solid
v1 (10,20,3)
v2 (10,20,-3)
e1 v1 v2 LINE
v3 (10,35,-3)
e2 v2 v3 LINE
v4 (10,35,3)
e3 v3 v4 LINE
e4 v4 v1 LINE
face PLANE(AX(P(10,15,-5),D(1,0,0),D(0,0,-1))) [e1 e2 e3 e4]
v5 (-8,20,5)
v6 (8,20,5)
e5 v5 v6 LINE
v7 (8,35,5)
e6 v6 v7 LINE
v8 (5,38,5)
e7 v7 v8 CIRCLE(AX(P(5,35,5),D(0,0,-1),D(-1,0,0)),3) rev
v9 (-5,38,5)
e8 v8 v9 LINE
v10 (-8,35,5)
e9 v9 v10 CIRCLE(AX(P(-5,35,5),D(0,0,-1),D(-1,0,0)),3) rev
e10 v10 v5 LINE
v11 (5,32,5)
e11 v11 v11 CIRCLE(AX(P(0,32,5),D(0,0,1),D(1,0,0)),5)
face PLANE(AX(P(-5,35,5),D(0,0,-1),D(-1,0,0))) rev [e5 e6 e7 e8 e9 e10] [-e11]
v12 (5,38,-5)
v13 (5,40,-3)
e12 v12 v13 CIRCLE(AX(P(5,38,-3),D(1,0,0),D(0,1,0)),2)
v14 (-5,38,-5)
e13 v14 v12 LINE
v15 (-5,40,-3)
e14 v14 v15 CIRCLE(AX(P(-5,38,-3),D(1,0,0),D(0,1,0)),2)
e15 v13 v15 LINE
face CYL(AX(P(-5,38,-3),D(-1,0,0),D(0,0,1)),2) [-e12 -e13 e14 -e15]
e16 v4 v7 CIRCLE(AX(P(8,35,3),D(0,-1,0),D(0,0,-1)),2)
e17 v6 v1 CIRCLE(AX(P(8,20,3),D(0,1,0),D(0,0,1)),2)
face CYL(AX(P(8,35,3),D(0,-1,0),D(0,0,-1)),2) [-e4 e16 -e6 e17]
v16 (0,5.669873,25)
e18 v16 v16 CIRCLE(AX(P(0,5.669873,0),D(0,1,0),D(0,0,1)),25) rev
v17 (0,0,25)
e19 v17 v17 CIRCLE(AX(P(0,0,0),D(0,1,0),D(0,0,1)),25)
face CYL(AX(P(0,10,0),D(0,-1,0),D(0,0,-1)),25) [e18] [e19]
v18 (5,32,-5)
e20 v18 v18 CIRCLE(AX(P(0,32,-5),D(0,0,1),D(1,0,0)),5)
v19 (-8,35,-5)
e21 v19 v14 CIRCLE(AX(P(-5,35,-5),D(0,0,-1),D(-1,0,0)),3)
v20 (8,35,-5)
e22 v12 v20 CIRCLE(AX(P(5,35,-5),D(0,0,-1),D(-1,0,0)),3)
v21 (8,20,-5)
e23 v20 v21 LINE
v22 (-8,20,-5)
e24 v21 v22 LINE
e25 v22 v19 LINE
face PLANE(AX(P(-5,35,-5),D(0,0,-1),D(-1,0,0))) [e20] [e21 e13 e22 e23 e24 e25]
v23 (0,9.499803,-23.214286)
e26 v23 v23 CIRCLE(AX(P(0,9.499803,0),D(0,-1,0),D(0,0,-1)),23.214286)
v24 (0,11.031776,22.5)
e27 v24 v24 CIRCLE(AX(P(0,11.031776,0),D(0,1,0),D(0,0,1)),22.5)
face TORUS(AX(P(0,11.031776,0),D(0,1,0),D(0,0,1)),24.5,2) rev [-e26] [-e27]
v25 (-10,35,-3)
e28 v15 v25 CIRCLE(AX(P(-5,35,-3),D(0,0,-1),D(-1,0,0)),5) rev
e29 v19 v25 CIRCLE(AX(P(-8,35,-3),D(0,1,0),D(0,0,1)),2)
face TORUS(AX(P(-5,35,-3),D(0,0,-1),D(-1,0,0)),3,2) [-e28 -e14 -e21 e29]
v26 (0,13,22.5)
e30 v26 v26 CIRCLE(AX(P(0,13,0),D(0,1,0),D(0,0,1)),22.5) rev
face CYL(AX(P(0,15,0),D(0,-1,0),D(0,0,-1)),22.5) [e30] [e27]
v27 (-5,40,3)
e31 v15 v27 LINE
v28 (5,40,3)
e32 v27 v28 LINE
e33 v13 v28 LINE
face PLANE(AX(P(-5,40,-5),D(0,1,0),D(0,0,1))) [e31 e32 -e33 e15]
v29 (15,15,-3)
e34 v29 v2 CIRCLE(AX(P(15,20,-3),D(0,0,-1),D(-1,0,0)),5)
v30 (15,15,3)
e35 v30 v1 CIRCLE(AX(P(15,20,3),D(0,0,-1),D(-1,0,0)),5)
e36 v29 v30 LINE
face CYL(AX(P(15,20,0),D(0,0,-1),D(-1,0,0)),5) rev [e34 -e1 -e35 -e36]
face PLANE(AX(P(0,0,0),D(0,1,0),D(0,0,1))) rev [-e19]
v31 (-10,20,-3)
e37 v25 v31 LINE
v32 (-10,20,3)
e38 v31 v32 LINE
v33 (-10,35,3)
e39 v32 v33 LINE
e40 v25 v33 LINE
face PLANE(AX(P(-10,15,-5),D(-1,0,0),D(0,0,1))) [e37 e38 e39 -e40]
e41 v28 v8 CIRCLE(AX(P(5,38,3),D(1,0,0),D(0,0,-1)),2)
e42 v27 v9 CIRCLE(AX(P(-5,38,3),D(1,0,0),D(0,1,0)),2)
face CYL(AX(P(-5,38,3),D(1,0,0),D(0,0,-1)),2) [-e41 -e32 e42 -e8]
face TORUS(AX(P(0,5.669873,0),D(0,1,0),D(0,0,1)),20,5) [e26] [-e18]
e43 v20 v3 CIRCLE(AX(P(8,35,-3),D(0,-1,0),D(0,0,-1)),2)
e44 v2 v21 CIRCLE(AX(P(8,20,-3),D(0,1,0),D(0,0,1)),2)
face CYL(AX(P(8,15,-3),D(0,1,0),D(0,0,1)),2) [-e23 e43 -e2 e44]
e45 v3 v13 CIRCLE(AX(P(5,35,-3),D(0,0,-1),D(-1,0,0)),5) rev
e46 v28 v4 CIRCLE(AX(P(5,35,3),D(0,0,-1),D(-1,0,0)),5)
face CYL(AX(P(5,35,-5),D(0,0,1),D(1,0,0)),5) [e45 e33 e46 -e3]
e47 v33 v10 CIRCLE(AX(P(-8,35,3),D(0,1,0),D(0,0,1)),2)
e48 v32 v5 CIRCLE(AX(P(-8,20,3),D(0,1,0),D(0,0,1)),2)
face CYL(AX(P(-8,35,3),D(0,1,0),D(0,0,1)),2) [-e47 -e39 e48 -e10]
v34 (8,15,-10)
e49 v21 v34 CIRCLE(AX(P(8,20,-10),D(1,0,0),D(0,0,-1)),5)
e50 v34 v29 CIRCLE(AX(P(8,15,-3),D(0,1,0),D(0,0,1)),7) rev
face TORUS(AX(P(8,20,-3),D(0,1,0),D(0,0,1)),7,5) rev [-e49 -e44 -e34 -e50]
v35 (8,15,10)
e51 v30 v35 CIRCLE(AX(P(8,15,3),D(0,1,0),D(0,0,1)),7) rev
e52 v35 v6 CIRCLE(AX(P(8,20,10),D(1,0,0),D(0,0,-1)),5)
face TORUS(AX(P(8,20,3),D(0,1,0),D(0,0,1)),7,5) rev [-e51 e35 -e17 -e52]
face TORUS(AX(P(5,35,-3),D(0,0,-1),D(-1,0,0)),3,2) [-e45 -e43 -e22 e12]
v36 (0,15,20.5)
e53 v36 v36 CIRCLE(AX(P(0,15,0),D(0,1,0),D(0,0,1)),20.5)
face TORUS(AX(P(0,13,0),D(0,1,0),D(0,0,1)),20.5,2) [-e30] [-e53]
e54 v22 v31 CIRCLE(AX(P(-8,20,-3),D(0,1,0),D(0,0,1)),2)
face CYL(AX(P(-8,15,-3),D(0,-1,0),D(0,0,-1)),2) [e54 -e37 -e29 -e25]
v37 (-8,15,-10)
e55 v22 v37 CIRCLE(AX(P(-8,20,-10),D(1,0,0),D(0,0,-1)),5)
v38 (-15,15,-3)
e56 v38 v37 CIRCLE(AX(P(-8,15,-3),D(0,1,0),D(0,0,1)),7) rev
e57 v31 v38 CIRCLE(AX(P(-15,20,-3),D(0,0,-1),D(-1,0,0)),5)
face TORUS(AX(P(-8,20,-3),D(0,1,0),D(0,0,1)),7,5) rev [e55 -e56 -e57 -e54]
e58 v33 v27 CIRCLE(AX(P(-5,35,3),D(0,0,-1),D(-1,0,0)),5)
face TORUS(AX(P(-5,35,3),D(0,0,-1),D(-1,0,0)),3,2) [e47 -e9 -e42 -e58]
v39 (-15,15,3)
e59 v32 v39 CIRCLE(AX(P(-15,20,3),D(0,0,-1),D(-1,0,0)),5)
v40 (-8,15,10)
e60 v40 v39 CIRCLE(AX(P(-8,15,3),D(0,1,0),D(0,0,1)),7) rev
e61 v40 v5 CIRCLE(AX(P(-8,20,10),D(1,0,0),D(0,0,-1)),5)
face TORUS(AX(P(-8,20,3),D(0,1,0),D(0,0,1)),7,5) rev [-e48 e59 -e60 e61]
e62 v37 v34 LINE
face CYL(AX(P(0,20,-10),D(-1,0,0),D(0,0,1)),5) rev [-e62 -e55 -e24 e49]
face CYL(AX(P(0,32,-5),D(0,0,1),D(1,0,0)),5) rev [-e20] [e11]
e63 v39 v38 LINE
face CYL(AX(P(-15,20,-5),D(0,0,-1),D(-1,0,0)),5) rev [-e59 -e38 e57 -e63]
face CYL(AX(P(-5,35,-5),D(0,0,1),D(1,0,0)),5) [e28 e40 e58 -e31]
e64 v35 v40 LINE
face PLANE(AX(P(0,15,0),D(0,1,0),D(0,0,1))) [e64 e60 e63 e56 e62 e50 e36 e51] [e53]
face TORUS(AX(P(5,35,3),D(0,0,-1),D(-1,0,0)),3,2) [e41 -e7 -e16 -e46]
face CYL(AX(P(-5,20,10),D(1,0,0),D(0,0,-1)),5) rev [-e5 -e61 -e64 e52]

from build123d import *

# Parameters (mm, degrees)
SKETCH1_R           = 25
BOSS_EXTRUDE1_DEPTH = 10
SKETCH2_R           = 22.5
BOSS_EXTRUDE2_DEPTH = 5
FILLET3_R           = 5
FILLET4_R           = 2
FILLET5_R           = 2
SKETCH3_R           = 5
BOSS_EXTRUDE3_DEPTH = 5
FILLET6_R           = 2
FILLET7_R           = 2
FILLET8_R           = 5


with BuildPart() as part:
    # Sketch1 → Boss-Extrude1 (new body)
    with BuildSketch(Plane(origin=(0, 0, 0), x_dir=(1, 0, 0), z_dir=(0, 1, 0))):
        with Locations(Location((0, 0, 0), (0, 0, 270))):
            Circle(SKETCH1_R)
    extrude(amount=BOSS_EXTRUDE1_DEPTH)

    # Sketch2 → Boss-Extrude2 (add)
    with BuildSketch(Plane(origin=(0, 10, 0), x_dir=(1, 0, 0), z_dir=(0, 1, 0))):
        with Locations(Location((0, 0, 0), (0, 0, 270))):
            Circle(SKETCH2_R)
    extrude(amount=BOSS_EXTRUDE2_DEPTH)

    # Fillet3
    # the kernel refuses this fillet: 5 mm, written as the material it takes off along each edge
    with BuildSketch(Plane(origin=(0, 10, 0), x_dir=(0, 0, 1), z_dir=(-1, 0, 0))) as fillet3_piece_1:
        with BuildLine():
            CenterArc((20, -4.330127019), FILLET3_R, 0, 60)
            Line((22.5, 0), (22.55, 0.08660254))
            ThreePointArc((22.55, 0.08660254), (23.75, 0.1), (25, 0.1))
            Line((25, 0.1), (25.1, 0))
            Line((25.1, 0), (25.1, -4.330127019))
            Line((25.1, -4.330127019), (25, -4.330127019))
        make_face()
    revolve(axis=Axis((0, 10, 0), (0, 1, 0)), mode=Mode.SUBTRACT)

    # Fillet4
    fillet4_edges = [part.edges().sort_by_distance(p)[0] for p in [
        (0, 15, -22.5),
    ]]
    fillet(fillet4_edges, radius=FILLET4_R)

    # Fillet5
    fillet5_edges = [part.edges().sort_by_distance(p)[0] for p in [
        (0, 10, -22.5),
    ]]
    fillet(fillet5_edges, radius=FILLET5_R)

    # Sketch3 → Boss-Extrude3 (add, symmetric)
    with BuildSketch(Plane.XY):
        with BuildLine():
            Line((-10, 15), (10, 15))
            Line((10, 15), (10, 35))
            ThreePointArc((10, 35), (8.535533906, 38.535533906), (5, 40))
            Line((5, 40), (-5, 40))
            ThreePointArc((-5, 40), (-8.535533906, 38.535533906), (-10, 35))
            Line((-10, 35), (-10, 15))
        make_face()
        with Locations((0, 32)):
            Circle(SKETCH3_R, mode=Mode.SUBTRACT)
    extrude(amount=BOSS_EXTRUDE3_DEPTH, both=True)

    # Fillet6
    fillet6_edges = [part.edges().sort_by_distance(p)[0] for p in [
        (-10, 25, 5),
        (10, 25, 5),
        (8.535533906, 38.535533906, 5),
        (0, 40, 5),
        (-8.535533906, 38.535533906, 5),
    ]]
    fillet(fillet6_edges, radius=FILLET6_R)

    # Fillet7
    fillet7_edges = [part.edges().sort_by_distance(p)[0] for p in [
        (-10, 25, -5),
        (-8.535533906, 38.535533906, -5),
        (0, 40, -5),
        (8.535533906, 38.535533906, -5),
        (10, 25, -5),
    ]]
    fillet(fillet7_edges, radius=FILLET7_R)

    # Fillet8
    fillet8_edges = [part.edges().sort_by_distance(p)[0] for p in [
        (0, 15, 5),
        (9.414213562, 15, 4.414213562),
        (-9.414213562, 15, 4.414213562),
        (10, 15, 0),
        (0, 15, -5),
        (-10, 15, 0),
        (9.414213562, 15, -4.414213562),
        (-9.414213562, 15, -4.414213562),
    ]]
    fillet(fillet8_edges, radius=FILLET8_R)


solid = part.part
